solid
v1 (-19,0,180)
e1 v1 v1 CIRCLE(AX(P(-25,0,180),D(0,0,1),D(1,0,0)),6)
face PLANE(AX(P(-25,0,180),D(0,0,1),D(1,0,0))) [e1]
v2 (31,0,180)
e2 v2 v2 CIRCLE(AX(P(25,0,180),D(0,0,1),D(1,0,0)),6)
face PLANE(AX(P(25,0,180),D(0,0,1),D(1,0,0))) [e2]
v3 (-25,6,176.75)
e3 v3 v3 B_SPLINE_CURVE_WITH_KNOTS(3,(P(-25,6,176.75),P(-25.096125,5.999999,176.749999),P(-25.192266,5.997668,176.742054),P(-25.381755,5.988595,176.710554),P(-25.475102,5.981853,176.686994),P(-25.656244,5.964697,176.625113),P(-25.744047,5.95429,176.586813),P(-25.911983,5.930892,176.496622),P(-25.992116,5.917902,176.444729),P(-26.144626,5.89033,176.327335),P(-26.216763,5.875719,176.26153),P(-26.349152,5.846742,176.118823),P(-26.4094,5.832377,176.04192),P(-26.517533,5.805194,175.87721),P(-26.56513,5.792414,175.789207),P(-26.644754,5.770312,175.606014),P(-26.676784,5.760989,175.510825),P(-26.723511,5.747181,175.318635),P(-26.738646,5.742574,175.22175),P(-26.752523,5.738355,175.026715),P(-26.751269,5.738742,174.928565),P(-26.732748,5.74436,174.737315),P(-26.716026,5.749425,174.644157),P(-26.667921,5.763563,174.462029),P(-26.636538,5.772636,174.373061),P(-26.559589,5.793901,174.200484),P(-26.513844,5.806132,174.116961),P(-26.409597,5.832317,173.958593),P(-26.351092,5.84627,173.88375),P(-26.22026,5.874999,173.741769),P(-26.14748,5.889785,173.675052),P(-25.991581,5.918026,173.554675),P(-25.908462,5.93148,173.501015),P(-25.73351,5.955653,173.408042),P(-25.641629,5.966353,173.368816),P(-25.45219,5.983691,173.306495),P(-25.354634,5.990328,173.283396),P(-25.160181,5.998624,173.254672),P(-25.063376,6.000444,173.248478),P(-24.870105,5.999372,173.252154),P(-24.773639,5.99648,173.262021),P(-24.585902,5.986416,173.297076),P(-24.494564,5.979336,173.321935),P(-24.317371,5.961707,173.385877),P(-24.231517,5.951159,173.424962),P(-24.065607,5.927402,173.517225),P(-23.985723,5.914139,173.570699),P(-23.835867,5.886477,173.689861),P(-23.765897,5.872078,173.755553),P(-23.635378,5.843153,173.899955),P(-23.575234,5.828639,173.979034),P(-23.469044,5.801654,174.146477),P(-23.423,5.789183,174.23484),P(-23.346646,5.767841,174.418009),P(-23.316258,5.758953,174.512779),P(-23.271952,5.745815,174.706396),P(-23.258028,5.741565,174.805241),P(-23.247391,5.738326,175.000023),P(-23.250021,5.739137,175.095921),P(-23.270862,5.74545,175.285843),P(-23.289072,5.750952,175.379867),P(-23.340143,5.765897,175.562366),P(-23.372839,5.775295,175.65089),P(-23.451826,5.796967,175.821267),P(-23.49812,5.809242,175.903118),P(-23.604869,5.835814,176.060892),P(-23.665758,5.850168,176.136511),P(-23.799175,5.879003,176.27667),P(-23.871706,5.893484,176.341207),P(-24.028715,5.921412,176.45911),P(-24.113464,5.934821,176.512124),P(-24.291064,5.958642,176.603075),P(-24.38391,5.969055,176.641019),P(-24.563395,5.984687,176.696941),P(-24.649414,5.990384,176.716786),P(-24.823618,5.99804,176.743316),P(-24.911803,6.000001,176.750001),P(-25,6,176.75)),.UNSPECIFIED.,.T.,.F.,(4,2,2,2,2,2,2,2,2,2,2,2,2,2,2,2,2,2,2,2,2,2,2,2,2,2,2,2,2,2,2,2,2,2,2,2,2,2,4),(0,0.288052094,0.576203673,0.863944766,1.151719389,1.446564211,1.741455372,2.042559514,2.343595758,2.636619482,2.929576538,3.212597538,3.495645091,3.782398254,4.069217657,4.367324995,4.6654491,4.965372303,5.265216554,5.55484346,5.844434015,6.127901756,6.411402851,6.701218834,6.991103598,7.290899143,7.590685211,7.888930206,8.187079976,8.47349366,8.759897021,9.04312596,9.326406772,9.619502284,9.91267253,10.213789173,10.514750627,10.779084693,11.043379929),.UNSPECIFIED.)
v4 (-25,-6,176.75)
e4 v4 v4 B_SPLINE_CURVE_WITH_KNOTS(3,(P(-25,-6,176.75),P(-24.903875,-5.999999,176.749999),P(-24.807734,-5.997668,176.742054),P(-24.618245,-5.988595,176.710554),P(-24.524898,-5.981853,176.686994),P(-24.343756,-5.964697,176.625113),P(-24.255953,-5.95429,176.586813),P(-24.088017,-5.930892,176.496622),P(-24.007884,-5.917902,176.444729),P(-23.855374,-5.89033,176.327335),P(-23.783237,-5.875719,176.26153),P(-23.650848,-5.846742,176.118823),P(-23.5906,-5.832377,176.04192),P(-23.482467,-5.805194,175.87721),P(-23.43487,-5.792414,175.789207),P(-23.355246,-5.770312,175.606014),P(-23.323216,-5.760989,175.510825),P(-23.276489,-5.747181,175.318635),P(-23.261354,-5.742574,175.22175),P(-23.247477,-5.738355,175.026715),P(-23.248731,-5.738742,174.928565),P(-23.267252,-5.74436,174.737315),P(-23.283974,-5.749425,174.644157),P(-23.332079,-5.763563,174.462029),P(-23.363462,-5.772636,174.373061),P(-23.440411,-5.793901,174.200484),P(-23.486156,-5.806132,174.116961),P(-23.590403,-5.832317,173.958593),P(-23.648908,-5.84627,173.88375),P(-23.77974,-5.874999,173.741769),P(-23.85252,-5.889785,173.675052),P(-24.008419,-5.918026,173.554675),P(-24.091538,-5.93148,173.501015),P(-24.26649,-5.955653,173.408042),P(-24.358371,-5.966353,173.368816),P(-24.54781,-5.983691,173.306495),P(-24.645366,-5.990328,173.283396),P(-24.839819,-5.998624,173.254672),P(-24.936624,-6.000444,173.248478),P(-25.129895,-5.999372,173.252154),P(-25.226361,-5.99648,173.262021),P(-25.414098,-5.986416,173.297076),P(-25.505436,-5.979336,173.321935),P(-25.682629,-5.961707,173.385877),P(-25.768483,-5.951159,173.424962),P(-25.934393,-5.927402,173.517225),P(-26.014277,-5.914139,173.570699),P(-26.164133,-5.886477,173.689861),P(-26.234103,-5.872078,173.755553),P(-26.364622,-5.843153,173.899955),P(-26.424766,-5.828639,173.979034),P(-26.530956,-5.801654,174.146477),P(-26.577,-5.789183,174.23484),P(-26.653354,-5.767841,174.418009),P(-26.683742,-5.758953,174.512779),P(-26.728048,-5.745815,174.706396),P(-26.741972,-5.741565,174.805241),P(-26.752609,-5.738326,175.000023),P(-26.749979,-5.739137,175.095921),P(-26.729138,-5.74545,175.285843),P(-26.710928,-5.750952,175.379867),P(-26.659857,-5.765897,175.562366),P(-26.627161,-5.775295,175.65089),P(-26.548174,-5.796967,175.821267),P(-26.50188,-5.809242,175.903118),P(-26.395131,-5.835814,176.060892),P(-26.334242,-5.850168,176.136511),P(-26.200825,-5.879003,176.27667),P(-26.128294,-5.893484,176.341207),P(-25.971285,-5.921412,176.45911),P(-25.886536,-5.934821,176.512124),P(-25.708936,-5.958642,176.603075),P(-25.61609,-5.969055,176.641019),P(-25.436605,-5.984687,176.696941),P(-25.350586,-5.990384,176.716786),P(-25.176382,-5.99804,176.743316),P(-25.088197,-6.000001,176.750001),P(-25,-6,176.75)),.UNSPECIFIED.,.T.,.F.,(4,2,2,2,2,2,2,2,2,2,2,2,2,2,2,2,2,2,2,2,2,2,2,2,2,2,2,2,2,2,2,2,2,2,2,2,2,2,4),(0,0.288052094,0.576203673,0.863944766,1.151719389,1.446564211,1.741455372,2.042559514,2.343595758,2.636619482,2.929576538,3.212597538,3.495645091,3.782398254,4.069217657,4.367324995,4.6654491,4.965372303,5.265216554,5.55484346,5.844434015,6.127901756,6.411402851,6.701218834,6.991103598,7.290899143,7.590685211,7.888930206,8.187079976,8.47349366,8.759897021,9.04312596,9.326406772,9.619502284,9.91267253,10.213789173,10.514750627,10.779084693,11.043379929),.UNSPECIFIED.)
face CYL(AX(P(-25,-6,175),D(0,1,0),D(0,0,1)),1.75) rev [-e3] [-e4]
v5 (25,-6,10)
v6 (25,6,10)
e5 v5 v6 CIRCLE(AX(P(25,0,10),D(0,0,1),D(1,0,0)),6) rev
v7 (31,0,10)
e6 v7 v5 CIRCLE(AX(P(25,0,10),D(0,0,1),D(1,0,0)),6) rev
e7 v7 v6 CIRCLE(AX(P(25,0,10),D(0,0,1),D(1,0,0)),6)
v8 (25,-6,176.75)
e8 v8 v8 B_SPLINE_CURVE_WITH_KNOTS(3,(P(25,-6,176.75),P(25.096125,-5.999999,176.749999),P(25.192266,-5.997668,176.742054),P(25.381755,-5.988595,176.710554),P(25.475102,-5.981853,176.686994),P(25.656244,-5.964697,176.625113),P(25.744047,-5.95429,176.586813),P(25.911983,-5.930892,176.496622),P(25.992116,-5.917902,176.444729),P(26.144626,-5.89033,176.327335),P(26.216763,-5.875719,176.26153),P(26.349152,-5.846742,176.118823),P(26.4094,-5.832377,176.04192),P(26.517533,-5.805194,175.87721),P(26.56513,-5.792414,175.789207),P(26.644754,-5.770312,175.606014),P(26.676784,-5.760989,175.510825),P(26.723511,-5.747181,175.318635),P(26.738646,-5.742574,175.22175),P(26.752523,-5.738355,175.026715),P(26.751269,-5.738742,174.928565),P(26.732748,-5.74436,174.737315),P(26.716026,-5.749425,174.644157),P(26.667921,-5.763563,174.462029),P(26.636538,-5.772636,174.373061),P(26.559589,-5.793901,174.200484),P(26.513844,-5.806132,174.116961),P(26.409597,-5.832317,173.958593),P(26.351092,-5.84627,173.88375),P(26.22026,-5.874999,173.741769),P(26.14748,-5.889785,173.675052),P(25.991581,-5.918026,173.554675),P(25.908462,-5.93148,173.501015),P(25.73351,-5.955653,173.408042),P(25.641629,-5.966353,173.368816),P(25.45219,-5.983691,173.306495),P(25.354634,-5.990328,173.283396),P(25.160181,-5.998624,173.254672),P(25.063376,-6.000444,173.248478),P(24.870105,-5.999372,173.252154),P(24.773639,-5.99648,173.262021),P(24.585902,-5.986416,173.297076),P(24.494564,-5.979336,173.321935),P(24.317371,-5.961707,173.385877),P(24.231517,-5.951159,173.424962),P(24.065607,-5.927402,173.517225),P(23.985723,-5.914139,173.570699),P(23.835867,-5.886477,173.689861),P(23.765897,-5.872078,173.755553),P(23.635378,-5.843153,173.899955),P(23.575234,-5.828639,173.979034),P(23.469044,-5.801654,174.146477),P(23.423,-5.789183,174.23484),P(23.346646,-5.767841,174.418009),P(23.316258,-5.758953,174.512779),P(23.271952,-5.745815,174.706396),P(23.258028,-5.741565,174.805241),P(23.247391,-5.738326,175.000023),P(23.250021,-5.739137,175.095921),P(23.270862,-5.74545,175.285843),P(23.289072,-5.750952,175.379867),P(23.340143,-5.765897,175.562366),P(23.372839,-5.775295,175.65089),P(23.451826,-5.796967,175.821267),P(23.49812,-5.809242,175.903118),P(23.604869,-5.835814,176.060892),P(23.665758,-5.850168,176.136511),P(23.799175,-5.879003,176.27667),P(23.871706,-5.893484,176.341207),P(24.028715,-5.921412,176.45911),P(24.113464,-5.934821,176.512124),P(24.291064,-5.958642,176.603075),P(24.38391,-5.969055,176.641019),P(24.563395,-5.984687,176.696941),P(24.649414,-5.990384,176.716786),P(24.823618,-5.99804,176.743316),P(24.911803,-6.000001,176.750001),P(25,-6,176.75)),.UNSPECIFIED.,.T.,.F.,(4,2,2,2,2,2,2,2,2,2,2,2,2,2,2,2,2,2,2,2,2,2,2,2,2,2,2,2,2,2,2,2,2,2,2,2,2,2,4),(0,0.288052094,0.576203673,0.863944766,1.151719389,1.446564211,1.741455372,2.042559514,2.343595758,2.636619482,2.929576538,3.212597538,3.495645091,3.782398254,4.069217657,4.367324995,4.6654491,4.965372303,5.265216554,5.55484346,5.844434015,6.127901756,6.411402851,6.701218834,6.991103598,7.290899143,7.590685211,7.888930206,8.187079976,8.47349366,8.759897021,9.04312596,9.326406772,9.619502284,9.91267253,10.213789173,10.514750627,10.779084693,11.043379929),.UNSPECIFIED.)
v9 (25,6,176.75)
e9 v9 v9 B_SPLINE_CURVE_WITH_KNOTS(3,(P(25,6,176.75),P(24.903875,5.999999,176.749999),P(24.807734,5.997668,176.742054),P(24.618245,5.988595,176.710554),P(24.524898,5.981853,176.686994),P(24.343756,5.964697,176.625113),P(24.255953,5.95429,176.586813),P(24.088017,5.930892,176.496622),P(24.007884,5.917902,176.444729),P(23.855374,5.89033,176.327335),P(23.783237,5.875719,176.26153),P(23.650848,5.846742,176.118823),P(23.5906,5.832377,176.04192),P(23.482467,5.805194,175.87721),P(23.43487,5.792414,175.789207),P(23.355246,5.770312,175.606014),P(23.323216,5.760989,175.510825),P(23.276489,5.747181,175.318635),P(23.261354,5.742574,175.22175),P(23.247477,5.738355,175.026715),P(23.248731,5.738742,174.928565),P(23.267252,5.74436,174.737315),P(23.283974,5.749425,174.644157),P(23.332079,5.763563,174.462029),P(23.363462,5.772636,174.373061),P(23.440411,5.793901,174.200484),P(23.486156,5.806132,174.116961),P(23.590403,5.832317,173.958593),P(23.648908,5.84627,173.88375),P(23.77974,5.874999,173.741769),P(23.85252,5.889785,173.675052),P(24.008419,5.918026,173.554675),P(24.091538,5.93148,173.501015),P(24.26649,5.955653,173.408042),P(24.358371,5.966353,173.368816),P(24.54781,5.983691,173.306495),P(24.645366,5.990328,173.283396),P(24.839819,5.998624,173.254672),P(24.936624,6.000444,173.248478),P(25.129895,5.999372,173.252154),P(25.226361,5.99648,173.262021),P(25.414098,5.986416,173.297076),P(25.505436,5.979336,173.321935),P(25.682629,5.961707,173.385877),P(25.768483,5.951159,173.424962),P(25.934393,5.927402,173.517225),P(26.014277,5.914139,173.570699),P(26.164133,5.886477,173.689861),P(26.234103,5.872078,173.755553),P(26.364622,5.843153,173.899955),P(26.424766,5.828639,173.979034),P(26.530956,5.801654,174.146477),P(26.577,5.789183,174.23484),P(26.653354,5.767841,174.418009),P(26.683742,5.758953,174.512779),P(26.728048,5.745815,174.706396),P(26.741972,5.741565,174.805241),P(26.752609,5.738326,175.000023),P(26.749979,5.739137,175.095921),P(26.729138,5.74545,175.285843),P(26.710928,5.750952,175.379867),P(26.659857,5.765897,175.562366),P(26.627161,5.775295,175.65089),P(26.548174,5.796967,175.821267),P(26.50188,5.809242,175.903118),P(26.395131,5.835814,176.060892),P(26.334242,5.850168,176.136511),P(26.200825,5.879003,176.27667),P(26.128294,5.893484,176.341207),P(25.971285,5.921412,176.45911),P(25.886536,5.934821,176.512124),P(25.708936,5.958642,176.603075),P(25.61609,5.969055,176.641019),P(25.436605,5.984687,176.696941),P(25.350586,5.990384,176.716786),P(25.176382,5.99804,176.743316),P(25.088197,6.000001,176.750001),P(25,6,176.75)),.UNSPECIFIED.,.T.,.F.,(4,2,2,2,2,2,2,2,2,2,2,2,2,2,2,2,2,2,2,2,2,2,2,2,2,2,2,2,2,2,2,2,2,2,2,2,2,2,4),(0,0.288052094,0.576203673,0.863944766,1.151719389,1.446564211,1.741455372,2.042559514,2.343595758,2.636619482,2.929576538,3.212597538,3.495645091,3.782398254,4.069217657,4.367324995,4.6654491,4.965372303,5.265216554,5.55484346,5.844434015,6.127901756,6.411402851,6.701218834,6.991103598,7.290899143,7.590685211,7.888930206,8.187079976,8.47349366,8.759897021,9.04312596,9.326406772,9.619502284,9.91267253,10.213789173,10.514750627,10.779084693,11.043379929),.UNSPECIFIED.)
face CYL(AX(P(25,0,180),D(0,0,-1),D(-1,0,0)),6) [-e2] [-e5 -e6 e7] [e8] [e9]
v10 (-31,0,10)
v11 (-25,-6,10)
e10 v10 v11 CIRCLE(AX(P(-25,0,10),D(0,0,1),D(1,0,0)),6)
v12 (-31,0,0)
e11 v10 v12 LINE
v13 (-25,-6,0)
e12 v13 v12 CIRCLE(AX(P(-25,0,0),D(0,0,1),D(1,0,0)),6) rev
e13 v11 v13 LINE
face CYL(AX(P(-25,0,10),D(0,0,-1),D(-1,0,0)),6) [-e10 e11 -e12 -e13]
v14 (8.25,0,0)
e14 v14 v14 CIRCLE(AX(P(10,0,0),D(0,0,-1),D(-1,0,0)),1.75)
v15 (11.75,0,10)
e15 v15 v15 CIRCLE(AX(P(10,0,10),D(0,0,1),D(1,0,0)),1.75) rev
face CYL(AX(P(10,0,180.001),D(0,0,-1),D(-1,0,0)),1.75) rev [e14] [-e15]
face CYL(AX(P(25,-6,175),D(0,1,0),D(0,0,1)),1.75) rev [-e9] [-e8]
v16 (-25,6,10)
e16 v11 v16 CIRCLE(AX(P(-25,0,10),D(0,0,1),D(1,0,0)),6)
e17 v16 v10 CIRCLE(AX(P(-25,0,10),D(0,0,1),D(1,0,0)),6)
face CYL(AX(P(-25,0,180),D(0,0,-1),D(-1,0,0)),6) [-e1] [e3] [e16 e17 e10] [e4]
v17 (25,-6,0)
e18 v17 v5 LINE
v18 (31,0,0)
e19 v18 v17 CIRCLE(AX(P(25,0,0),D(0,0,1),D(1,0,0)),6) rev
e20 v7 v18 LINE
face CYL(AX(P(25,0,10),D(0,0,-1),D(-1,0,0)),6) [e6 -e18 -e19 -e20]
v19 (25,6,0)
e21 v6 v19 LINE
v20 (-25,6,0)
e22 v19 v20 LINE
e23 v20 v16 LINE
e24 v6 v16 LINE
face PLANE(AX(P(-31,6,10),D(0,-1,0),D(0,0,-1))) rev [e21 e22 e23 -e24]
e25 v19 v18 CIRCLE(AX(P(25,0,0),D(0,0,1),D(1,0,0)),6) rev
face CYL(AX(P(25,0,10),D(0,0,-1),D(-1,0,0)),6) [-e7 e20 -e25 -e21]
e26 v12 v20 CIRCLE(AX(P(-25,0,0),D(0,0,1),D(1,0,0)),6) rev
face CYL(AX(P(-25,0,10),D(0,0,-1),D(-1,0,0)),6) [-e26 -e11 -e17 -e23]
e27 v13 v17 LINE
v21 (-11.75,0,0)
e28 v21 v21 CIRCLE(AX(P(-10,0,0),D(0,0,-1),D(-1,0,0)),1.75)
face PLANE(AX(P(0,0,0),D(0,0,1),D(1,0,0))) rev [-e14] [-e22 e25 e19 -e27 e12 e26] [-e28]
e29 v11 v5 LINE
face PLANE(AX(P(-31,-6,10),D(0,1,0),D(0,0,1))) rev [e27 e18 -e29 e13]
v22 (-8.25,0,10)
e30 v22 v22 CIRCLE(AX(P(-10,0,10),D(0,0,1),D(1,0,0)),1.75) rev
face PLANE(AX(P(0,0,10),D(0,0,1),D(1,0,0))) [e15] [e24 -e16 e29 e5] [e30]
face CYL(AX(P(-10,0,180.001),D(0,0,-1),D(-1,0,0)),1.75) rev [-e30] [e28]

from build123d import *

# Parameters (mm, degrees)
SKETCH1_W               = 62
SKETCH1_H               = 12
BOSS_EXTRUDE1_DEPTH     = 10
SKETCH2_R               = 6
BOSS_EXTRUDE2_DEPTH     = 170
FILLET1_R               = 6
CUT_EXTRUDE3_DEPTH      = 183.748461006
CUT_EXTRUDE3_DEPTH_BACK = 183.748461006
SKETCH6_R               = 1.75
CUT_EXTRUDE4_REACH      = 184.748
SKETCH7_R               = 1.75


with BuildPart() as part:
    # Sketch1 → Boss-Extrude1 (new body)
    with BuildSketch(Plane.XY):
        Rectangle(SKETCH1_W, SKETCH1_H)
    extrude(amount=BOSS_EXTRUDE1_DEPTH)

    # Sketch2 → Boss-Extrude2 (add)
    with BuildSketch(Plane.XY.offset(10)):
        with Locations(Location((-25, 0, 0), (0, 0, 180))):
            Circle(SKETCH2_R)
        with Locations((25, 0)):
            Circle(SKETCH2_R)
    extrude(amount=BOSS_EXTRUDE2_DEPTH)

    # Fillet1
    fillet1_edges = [part.edges().sort_by_distance(p)[0] for p in [
        (-31, -6, 5),
        (-31, 6, 5),
        (31, 6, 5),
        (31, -6, 5),
    ]]
    fillet(fillet1_edges, radius=FILLET1_R - 0.0001)  # a hair under: the kernel refuses the full size

    # Sketch6 → Cut-Extrude3 (cut, two sides: drawn at the far end of the back side and taken through both)
    with BuildSketch(Plane(origin=(0, 0, 0), x_dir=(1, 0, 0), z_dir=(0, 1, 0)).offset(-CUT_EXTRUDE3_DEPTH_BACK)):
        with Locations(Location((-25, -175, 0), (0, 0, 270))):
            Circle(SKETCH6_R)
        with Locations(Location((25, -175, 0), (0, 0, 270))):
            Circle(SKETCH6_R)
    extrude(amount=CUT_EXTRUDE3_DEPTH + CUT_EXTRUDE3_DEPTH_BACK, mode=Mode.SUBTRACT)

    # Sketch7 → Cut-Extrude4 (cut, up to next)
    with BuildSketch(Plane(origin=(0, 0, 0), x_dir=(-1, 0, 0), z_dir=(0, 0, -1)), mode=Mode.PRIVATE) as cut_extrude4_sk1:
        with Locations((-10, 0)):
            Circle(SKETCH7_R)
    cut_extrude4_tool1 = extrude(cut_extrude4_sk1.sketch, amount=-CUT_EXTRUDE4_REACH, mode=Mode.PRIVATE) & part.part
    # Sketch7 → Cut-Extrude4 (cut, up to next)
    with BuildSketch(Plane(origin=(0, 0, 0), x_dir=(-1, 0, 0), z_dir=(0, 0, -1)), mode=Mode.PRIVATE) as cut_extrude4_sk2:
        with Locations((10, 0)):
            Circle(SKETCH7_R)
    cut_extrude4_tool2 = extrude(cut_extrude4_sk2.sketch, amount=-CUT_EXTRUDE4_REACH, mode=Mode.PRIVATE) & part.part
    add(cut_extrude4_tool1.solids().sort_by_distance((10, 0, 0))[0], mode=Mode.SUBTRACT)
    add(cut_extrude4_tool2.solids().sort_by_distance((-10, 0, 0))[0], mode=Mode.SUBTRACT)


solid = part.part
